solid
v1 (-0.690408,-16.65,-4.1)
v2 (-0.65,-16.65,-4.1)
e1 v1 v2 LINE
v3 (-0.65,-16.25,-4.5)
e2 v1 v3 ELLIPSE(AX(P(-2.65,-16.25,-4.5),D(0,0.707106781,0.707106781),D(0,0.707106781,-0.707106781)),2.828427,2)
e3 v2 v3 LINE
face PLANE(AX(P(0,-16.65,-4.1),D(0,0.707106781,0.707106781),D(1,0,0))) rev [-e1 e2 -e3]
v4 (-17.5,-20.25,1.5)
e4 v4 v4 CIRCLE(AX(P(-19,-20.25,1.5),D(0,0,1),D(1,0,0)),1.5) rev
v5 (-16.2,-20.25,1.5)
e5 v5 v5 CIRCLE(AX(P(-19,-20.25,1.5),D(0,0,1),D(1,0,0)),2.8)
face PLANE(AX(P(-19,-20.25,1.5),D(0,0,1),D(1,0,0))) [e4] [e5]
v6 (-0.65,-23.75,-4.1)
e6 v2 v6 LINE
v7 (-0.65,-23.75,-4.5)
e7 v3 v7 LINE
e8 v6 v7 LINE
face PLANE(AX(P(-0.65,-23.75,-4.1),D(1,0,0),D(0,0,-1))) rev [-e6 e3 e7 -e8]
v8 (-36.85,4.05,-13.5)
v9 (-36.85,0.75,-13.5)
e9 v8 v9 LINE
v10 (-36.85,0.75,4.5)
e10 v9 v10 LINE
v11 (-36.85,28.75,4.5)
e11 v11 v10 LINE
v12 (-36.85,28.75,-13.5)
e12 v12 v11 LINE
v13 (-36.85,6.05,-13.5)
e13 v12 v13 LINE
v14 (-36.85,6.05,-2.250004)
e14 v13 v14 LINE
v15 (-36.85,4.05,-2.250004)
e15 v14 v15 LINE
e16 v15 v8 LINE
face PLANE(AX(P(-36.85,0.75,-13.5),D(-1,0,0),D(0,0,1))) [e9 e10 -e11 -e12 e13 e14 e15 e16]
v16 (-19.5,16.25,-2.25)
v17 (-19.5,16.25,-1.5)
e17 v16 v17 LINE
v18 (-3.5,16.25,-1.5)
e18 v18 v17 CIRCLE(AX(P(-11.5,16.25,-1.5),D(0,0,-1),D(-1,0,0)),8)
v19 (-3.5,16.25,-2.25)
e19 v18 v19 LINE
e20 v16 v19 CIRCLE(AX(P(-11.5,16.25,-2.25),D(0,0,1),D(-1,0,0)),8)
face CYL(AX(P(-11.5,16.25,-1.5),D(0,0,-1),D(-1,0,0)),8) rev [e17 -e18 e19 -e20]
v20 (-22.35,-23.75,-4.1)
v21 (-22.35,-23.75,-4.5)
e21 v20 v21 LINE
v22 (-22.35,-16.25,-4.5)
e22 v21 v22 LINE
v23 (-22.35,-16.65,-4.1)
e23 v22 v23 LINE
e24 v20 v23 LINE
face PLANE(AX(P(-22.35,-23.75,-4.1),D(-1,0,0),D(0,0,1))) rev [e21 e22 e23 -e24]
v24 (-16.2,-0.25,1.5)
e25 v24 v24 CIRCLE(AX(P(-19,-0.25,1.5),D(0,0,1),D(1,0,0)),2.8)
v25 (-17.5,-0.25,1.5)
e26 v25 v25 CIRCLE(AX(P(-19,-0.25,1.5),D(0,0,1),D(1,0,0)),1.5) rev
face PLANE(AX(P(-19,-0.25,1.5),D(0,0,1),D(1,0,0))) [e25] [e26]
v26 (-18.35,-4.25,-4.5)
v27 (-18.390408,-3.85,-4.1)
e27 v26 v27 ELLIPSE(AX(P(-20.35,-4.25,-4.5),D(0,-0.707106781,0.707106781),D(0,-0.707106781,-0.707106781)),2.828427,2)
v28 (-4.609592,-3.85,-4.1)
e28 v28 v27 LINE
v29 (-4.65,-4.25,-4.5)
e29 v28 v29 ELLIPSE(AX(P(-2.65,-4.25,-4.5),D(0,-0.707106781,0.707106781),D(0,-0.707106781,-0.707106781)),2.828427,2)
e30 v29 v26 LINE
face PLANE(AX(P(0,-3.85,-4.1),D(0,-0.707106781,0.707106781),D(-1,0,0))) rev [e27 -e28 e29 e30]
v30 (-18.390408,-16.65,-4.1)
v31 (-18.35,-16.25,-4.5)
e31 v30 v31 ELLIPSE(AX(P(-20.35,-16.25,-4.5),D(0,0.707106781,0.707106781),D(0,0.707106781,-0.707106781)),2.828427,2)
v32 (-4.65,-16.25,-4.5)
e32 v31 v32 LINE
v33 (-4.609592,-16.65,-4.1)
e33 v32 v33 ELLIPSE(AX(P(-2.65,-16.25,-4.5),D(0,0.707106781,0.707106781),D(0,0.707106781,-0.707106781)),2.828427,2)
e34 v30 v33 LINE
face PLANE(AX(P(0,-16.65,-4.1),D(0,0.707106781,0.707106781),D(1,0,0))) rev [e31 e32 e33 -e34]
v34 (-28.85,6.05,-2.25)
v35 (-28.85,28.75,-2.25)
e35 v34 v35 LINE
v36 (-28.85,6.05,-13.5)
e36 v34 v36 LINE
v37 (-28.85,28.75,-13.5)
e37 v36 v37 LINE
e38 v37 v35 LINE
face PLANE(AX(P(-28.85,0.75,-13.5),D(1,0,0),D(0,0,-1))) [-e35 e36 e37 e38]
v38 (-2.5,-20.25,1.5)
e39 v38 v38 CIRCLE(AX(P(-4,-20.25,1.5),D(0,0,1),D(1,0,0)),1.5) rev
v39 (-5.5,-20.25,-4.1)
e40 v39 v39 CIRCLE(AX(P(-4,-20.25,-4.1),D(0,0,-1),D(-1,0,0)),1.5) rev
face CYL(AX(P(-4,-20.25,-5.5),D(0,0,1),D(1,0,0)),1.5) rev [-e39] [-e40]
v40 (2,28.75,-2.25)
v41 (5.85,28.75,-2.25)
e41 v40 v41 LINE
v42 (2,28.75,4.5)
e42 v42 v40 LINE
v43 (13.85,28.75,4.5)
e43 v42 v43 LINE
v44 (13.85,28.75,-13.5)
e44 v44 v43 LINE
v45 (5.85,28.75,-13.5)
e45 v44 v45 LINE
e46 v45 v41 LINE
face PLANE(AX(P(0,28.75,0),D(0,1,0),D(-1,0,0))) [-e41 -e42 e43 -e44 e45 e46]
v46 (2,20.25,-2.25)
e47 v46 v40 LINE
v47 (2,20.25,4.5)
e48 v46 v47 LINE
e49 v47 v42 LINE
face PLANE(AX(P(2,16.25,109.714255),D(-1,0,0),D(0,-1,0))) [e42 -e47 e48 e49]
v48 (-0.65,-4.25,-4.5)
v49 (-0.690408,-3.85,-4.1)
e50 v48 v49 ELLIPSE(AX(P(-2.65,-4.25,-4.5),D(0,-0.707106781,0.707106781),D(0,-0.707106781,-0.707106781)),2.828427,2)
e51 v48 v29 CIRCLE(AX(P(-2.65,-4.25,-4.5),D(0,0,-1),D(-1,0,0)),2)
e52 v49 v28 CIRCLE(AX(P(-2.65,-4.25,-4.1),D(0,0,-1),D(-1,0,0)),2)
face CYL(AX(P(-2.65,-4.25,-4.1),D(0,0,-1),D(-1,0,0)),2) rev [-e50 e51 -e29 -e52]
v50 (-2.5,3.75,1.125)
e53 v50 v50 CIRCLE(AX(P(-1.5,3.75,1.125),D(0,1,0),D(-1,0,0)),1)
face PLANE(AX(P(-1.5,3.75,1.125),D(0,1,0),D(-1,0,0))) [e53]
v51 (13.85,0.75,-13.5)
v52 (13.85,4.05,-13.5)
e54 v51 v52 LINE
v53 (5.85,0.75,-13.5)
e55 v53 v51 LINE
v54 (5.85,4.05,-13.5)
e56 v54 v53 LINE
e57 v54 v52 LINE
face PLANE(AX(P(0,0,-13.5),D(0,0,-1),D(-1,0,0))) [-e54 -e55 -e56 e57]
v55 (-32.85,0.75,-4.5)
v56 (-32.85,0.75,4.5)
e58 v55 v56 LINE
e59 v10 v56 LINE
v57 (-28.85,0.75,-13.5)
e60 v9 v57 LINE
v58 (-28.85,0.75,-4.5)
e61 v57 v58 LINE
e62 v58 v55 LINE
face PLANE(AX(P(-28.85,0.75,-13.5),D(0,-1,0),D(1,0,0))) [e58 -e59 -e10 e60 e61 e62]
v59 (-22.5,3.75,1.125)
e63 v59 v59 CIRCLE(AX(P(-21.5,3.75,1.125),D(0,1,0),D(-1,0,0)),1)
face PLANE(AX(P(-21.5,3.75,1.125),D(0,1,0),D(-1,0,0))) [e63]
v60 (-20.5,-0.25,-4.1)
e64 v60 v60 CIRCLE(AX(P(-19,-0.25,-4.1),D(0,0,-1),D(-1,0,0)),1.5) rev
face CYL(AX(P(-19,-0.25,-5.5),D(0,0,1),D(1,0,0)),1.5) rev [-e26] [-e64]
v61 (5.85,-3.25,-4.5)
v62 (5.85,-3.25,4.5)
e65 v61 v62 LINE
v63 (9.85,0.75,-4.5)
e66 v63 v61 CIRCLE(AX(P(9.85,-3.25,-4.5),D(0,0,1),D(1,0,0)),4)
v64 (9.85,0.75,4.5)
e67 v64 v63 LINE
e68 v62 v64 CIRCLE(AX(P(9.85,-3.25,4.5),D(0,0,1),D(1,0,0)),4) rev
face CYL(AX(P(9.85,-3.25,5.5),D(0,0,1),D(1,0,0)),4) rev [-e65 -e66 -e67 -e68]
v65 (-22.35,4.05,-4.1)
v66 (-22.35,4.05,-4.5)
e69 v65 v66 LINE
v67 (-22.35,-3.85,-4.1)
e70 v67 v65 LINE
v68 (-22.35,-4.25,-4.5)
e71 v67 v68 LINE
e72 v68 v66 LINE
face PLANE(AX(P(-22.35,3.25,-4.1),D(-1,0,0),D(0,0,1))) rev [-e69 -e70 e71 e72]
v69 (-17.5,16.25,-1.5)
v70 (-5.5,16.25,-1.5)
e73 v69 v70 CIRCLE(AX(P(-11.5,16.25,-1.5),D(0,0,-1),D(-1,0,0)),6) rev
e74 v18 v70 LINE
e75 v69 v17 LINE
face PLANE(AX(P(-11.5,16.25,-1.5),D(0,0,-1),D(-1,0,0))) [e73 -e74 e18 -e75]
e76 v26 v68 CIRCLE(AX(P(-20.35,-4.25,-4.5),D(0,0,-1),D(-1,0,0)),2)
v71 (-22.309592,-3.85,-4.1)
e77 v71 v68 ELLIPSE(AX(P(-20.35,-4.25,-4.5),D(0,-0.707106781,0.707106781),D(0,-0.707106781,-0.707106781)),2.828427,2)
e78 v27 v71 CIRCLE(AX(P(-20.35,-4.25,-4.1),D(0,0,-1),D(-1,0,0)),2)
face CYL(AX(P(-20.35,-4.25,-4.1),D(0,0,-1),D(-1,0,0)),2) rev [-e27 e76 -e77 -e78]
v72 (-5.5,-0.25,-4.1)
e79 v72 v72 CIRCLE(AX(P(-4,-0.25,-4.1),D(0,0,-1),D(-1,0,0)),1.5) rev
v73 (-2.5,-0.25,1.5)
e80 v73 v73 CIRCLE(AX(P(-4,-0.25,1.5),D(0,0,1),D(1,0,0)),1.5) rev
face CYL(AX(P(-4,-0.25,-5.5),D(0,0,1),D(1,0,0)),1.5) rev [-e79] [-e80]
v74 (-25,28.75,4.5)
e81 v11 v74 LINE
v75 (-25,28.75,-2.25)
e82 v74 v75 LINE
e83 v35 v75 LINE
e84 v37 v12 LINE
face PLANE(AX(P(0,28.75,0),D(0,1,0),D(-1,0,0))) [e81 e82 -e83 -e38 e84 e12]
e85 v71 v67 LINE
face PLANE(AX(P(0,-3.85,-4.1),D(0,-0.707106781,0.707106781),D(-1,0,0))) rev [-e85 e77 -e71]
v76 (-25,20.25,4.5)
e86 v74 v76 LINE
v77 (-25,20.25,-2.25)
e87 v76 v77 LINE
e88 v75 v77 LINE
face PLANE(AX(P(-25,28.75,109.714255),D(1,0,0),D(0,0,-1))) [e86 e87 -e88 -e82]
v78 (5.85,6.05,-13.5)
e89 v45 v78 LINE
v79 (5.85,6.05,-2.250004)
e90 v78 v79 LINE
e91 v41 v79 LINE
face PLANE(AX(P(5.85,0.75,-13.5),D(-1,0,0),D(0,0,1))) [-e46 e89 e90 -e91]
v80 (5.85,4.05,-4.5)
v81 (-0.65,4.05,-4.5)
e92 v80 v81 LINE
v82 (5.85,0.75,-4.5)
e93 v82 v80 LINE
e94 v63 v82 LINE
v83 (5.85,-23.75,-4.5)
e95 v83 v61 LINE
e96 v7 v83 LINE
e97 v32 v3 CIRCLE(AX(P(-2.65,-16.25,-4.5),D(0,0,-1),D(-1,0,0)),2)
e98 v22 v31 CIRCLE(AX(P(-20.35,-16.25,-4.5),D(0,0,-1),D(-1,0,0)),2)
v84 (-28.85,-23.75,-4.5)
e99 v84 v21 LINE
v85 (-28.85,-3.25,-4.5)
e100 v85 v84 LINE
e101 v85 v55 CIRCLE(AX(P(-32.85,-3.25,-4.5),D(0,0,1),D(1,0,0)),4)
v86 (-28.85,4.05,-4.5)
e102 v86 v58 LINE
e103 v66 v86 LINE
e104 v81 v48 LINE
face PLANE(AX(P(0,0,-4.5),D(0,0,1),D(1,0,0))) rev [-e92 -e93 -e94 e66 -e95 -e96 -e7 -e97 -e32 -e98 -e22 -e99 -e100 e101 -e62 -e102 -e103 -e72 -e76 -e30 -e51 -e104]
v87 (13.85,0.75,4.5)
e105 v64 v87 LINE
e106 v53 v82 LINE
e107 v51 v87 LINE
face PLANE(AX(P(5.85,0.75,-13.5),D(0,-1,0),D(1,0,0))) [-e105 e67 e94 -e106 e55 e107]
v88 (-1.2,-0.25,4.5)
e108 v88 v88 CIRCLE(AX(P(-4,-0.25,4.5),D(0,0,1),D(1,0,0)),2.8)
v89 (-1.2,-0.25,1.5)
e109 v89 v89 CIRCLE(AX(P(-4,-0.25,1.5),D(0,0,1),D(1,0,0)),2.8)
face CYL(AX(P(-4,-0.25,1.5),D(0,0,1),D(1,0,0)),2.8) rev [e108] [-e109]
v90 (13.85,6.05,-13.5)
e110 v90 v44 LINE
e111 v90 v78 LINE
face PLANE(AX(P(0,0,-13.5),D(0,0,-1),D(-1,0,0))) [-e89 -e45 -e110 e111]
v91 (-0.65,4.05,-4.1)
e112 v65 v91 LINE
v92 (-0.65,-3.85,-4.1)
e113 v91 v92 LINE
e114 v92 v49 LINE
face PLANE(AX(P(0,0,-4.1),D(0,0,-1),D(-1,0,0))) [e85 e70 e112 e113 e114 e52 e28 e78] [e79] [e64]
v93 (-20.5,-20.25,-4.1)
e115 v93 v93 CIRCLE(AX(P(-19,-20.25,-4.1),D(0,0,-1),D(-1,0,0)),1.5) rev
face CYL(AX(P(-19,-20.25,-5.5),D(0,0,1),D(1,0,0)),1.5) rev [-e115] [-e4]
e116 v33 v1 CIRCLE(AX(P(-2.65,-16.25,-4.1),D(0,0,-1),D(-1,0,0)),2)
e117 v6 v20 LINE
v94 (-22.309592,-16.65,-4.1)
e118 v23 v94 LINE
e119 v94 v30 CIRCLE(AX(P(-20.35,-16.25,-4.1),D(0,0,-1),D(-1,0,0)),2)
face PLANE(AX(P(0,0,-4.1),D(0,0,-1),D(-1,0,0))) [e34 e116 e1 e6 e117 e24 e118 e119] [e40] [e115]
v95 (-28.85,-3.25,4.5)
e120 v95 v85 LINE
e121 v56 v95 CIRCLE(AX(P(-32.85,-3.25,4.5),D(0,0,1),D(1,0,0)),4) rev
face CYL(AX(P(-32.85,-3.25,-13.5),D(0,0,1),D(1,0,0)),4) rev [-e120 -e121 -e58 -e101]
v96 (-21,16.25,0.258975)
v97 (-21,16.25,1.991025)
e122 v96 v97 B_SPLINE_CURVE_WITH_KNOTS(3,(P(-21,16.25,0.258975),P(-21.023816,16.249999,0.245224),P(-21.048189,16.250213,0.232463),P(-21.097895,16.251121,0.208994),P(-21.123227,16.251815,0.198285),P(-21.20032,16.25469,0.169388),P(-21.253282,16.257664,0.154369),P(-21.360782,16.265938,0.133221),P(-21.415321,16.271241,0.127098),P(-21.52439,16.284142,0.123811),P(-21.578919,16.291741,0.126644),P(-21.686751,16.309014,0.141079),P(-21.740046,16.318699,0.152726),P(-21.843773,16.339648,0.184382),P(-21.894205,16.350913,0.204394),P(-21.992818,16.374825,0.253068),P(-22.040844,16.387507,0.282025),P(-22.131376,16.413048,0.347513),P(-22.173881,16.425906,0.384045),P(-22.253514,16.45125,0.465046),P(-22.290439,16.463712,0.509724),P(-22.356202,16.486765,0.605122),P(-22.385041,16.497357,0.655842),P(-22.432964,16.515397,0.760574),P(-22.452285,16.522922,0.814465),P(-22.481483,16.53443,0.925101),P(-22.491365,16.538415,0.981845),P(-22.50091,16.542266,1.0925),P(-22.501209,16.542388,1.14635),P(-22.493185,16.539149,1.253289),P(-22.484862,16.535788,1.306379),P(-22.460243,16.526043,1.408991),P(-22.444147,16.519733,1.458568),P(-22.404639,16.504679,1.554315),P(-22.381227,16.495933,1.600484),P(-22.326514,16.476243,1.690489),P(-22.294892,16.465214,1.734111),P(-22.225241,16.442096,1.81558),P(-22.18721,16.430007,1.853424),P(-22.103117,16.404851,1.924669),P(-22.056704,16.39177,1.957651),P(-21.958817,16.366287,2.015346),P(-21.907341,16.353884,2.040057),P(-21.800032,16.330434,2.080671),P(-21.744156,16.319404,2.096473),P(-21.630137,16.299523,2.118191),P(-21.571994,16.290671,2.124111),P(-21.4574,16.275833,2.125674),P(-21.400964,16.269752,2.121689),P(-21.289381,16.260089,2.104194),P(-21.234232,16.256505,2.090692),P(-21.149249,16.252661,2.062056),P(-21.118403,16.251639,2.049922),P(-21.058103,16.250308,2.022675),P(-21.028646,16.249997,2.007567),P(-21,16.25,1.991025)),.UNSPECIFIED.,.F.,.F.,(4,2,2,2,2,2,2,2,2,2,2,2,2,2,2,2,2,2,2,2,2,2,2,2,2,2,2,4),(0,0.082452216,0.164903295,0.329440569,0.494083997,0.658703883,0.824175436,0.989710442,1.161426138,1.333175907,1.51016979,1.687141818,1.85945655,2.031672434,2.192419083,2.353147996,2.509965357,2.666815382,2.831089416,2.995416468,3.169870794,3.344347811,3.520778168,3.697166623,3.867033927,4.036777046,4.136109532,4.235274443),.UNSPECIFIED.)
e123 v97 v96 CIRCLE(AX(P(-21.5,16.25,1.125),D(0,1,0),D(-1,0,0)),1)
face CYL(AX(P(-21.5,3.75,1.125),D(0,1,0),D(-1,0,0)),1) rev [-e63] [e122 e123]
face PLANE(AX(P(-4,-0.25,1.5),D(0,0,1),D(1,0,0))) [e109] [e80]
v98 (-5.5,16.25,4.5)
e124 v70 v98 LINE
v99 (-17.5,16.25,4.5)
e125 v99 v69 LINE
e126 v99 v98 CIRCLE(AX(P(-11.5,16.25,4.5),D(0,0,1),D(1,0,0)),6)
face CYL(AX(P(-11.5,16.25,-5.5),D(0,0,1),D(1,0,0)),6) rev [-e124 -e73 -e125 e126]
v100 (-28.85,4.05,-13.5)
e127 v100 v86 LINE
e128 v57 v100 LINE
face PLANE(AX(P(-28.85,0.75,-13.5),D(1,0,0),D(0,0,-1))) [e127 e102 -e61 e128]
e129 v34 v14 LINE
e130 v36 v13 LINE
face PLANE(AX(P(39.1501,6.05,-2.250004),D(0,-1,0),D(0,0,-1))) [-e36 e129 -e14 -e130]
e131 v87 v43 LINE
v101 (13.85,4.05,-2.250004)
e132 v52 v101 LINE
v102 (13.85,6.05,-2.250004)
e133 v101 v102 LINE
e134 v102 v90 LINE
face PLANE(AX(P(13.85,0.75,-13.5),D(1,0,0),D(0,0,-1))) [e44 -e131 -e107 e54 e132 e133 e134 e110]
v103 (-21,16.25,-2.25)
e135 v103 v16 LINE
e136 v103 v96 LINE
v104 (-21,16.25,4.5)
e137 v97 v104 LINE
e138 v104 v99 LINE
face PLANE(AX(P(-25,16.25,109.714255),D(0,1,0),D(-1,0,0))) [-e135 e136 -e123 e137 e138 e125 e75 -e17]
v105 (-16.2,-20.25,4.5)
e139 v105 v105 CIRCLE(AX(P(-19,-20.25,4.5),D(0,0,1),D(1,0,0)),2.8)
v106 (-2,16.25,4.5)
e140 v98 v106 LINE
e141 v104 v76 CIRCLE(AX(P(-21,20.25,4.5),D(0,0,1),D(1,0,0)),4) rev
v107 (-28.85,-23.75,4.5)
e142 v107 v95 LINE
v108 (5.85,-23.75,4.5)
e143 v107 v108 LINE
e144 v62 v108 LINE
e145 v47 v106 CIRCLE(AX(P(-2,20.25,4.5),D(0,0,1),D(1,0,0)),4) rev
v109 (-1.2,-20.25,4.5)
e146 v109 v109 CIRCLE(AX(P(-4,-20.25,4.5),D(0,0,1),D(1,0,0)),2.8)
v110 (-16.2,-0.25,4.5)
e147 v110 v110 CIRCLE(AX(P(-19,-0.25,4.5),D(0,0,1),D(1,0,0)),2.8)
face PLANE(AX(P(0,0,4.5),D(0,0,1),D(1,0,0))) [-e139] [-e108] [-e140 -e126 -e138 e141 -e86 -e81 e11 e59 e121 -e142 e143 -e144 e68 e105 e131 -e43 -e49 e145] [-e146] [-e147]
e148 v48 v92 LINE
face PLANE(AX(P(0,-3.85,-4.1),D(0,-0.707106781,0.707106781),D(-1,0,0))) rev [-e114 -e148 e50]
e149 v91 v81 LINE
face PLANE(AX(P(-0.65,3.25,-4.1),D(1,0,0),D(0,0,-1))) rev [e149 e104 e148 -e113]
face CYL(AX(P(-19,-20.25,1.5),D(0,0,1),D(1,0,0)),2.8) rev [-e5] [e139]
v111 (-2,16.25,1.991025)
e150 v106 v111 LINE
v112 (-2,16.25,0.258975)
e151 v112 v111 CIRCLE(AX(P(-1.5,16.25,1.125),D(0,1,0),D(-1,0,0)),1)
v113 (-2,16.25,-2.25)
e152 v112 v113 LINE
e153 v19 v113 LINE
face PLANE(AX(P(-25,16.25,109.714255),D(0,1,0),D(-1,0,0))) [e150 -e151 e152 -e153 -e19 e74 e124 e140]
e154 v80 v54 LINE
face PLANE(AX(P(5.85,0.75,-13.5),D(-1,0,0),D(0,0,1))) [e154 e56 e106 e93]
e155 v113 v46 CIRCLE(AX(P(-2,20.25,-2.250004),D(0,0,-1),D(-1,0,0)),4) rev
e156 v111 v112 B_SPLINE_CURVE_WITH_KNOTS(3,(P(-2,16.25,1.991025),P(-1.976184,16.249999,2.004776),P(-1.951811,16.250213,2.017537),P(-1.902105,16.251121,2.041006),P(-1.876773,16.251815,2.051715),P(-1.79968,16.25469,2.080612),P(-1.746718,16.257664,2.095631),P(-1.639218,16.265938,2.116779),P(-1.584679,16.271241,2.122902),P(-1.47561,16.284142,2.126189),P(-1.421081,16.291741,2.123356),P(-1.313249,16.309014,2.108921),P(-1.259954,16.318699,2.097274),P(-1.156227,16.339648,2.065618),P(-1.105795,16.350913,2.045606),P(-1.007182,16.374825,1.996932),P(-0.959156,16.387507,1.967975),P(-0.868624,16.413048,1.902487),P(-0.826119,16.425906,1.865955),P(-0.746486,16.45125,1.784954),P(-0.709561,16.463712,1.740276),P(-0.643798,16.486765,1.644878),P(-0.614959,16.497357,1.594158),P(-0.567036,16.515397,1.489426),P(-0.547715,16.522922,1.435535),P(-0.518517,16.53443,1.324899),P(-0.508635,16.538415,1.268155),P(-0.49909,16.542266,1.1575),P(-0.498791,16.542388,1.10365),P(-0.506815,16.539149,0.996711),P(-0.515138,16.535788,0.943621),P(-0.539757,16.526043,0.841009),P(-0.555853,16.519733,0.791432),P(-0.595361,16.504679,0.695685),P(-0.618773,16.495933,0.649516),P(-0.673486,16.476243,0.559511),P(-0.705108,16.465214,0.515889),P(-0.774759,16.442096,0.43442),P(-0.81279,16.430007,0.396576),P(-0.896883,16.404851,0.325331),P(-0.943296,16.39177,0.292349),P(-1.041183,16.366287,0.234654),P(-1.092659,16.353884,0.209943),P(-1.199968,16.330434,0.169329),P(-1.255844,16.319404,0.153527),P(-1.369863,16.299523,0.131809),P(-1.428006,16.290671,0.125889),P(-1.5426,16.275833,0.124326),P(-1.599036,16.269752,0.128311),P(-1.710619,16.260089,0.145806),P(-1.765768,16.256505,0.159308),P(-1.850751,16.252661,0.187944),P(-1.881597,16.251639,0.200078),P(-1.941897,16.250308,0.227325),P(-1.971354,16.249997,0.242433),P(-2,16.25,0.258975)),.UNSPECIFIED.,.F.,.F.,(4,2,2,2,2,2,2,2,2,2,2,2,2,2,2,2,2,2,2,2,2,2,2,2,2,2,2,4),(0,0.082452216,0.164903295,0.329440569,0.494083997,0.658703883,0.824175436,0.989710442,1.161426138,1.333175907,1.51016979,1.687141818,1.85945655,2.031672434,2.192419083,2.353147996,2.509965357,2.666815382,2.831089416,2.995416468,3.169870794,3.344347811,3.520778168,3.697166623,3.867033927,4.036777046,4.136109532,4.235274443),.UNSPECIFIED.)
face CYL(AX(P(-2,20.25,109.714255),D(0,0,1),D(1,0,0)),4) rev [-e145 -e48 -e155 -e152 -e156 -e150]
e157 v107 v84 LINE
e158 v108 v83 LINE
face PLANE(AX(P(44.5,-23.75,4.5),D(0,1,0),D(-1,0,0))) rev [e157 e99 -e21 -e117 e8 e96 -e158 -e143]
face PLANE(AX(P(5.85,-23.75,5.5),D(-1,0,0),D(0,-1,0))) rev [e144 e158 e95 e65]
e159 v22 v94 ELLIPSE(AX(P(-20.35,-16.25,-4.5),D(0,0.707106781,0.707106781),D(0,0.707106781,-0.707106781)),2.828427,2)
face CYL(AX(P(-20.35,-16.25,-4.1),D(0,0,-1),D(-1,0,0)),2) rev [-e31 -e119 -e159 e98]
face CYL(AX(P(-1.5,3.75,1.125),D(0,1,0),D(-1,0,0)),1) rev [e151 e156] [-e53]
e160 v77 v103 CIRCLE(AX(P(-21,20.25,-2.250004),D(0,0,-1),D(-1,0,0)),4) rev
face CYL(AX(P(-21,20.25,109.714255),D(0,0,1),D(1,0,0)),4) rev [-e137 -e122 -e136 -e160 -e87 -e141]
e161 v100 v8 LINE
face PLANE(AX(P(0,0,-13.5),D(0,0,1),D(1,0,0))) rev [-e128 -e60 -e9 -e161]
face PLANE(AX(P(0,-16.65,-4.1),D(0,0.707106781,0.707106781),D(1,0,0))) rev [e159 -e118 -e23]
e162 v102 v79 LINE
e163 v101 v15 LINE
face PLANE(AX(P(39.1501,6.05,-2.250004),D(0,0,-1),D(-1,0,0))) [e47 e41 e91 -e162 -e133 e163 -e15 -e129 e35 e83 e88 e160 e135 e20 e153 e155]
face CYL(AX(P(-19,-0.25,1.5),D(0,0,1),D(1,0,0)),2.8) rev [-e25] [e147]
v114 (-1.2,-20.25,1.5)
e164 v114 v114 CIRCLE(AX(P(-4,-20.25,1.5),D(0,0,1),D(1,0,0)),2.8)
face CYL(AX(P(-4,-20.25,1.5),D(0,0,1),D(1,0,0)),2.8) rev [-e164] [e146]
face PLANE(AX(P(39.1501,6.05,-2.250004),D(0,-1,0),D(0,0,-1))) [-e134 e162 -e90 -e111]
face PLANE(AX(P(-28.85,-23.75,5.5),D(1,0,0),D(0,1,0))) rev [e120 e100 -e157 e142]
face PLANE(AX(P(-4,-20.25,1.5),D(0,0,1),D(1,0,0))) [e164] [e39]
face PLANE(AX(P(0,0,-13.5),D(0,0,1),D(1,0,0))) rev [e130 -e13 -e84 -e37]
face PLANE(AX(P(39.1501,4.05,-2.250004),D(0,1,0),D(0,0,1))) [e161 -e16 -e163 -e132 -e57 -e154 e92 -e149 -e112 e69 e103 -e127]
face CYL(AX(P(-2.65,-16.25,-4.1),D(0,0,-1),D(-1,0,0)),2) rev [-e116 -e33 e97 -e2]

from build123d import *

# Parameters (mm, degrees)
BOSS_EXTRUDE1_DEPTH      = 4.5
SKETCH4_W                = 35.509158229
SKETCH4_H                = 48.512063823
CUT_EXTRUDE2_DEPTH       = 10
SKETCH8_W                = 66
SKETCH8_H                = 9
BOSS_EXTRUDE3_DEPTH      = 5
FILLET7_R                = 10
SKETCH16_R               = 1.5
CUT_EXTRUDE6_DEPTH       = 10
SKETCH17_W               = 15.65
SKETCH17_H               = 52.5
CUT_EXTRUDE7_DEPTH       = 10
SKETCH18_R               = 6
CUT_EXTRUDE8_DEPTH       = 10
SKETCH20_W               = 8
SKETCH20_H               = 28
BOSS_EXTRUDE5_DEPTH      = 18
CUT_EXTRUDE10_DEPTH      = 51.084778127
CUT_EXTRUDE10_DEPTH_BACK = 9
SKETCH23_R               = 8
CUT_EXTRUDE11_DEPTH      = 3
CUT_EXTRUDE12_DEPTH      = 68.0001
CUT_EXTRUDE12_DEPTH_BACK = 8
CUT_EXTRUDE12_START      = -42.7
SKETCH24_W               = 11.249996001
SKETCH24_H               = 2
SKETCH25_R               = 1
CUT_EXTRUDE13_DEPTH      = 12.5
CUT_EXTRUDE15_DEPTH      = 2.25
FILLET8_R                = 4
SKETCH27_W               = 21.7
SKETCH27_H               = 7.5
CUT_EXTRUDE16_DEPTH      = 0.4
CHAMFER1_SIZE            = 0.4
CHAMFER2_SIZE            = 0.4
SKETCH28_R               = 2.8
CUT_EXTRUDE17_DEPTH      = 3
SKETCH29_R               = 2
SKETCH29_W               = 21.7
SKETCH29_H               = 0.8
CUT_EXTRUDE18_DEPTH      = 0.4


# Some blends are built 0.0001 mm under size
with BuildPart() as part:
    # Sketch1 → Boss-Extrude1 (new, symmetric)
    with BuildSketch(Plane.XY):
        Polygon((44.5, -23.75), (-0.5, -23.75), (-44.5, -23.75), (-44.5, 23.75), (44.5, 23.75), align=None)
    extrude(amount=BOSS_EXTRUDE1_DEPTH, both=True)

    # Sketch4 → Cut-Extrude2 (cut)
    with BuildSketch(Plane.XY.offset(4.5)):
        with Locations((39.254579115, -0.506031912)):
            Rectangle(SKETCH4_W, SKETCH4_H)
    extrude(amount=-CUT_EXTRUDE2_DEPTH, mode=Mode.SUBTRACT)

    # Sketch8 → Boss-Extrude3 (add)
    with BuildSketch(Plane(origin=(0, 23.75, 0), x_dir=(1, 0, 0), z_dir=(0, 1, 0))):
        with Locations((-11.5, 0)):
            Rectangle(SKETCH8_W, SKETCH8_H)
    extrude(amount=BOSS_EXTRUDE3_DEPTH)

    # Fillet7
    fillet7_edges = [part.edges().sort_by_distance(p)[0] for p in [
        (-44.5, 28.75, 0),
        (21.5, 28.75, 0),
    ]]
    fillet(fillet7_edges, radius=FILLET7_R)

    # Sketch16 → Cut-Extrude6 (cut)
    with BuildSketch(Plane.XY.offset(4.5)):
        with Locations((-19, -0.25)):
            Circle(SKETCH16_R)
        with Locations((-4, -0.25)):
            Circle(SKETCH16_R)
        with Locations((-19, -20.25)):
            Circle(SKETCH16_R)
        with Locations((-4, -20.25)):
            Circle(SKETCH16_R)
    extrude(amount=-CUT_EXTRUDE6_DEPTH, mode=Mode.SUBTRACT)

    # Sketch17 → Cut-Extrude7 (cut)
    with BuildSketch(Plane(origin=(0, 0, -4.5), x_dir=(-1, 0, 0), z_dir=(0, 0, -1))):
        with Locations((36.675, 2.5)):
            Rectangle(SKETCH17_W, SKETCH17_H)
        with Locations((-13.675, 2.5)):
            Rectangle(SKETCH17_W, SKETCH17_H)
    extrude(amount=-CUT_EXTRUDE7_DEPTH, mode=Mode.SUBTRACT)

    # Sketch18 → Cut-Extrude8 (cut)
    with BuildSketch(Plane.XY.offset(4.5)):
        with Locations((-11.5, 16.25)):
            Circle(SKETCH18_R)
    extrude(amount=-CUT_EXTRUDE8_DEPTH, mode=Mode.SUBTRACT)

    # Sketch20 → Boss-Extrude5 (add)
    with BuildSketch(Plane.XY.offset(4.5)):
        with Locations((-32.85, 14.75)):
            Rectangle(SKETCH20_W, SKETCH20_H)
        with Locations((9.85, 14.75)):
            Rectangle(SKETCH20_W, SKETCH20_H)
    extrude(amount=-BOSS_EXTRUDE5_DEPTH)

    # Sketch22 → Cut-Extrude10 (cut, two sides: drawn at the far end of the back side and taken through both)
    with BuildSketch(Plane.XY.offset(4.5).offset(-CUT_EXTRUDE10_DEPTH_BACK)):
        Polygon((-25, 169.372700937), (-25, 28.75), (-25, 16.25), (2, 16.25), (2, 28.75), (2, 169.372700937), (2, 450.61810281), (-25, 450.61810281), align=None)
    extrude(amount=CUT_EXTRUDE10_DEPTH + CUT_EXTRUDE10_DEPTH_BACK, mode=Mode.SUBTRACT)

    # Sketch23 → Cut-Extrude11 (cut)
    with BuildSketch(Plane(origin=(0, 0, -4.5), x_dir=(-1, 0, 0), z_dir=(0, 0, -1))):
        with Locations((11.5, 16.25)):
            Circle(SKETCH23_R)
    extrude(amount=-CUT_EXTRUDE11_DEPTH, mode=Mode.SUBTRACT)

    # Sketch24 → Cut-Extrude12 (cut, two sides: drawn at the far end of the back side and taken through both)
    with BuildSketch(Plane(origin=(13.85, 0, 0), x_dir=(0, 0, -1), z_dir=(1, 0, 0)).offset(CUT_EXTRUDE12_START - CUT_EXTRUDE12_DEPTH_BACK)):
        with Locations((7.875002, 5.05)):
            Rectangle(SKETCH24_W, SKETCH24_H)
    extrude(amount=CUT_EXTRUDE12_DEPTH + CUT_EXTRUDE12_DEPTH_BACK, mode=Mode.SUBTRACT)

    # Sketch25 → Cut-Extrude13 (cut)
    with BuildSketch(Plane(origin=(0, 16.25, 0), x_dir=(1, 0, 0), z_dir=(0, 1, 0))):
        with Locations(Location((-1.5, -1.125, 0), (0, 0, 180))):
            Circle(SKETCH25_R)
        with Locations(Location((-21.5, -1.125, 0), (0, 0, 180))):
            Circle(SKETCH25_R)
    extrude(amount=-CUT_EXTRUDE13_DEPTH, mode=Mode.SUBTRACT)

    # Sketch26 → Cut-Extrude15 (cut)
    with BuildSketch(Plane(origin=(0, 0, -4.5), x_dir=(-1, 0, 0), z_dir=(0, 0, -1))):
        with BuildLine():
            Line((-5.85, 6.05), (28.85, 6.05))
            Line((28.85, 6.05), (28.85, 28.75))
            Line((28.85, 28.75), (25, 28.75))
            Line((25, 28.75), (25, 16.25))
            Line((25, 16.25), (19.5, 16.25))
            ThreePointArc((19.5, 16.25), (11.5, 8.25), (3.5, 16.25))
            Line((3.5, 16.25), (-2, 16.25))
            Line((-2, 16.25), (-2, 28.75))
            Line((-2, 28.75), (-5.85, 28.75))
            Line((-5.85, 28.75), (-5.85, 6.05))
        make_face()
    extrude(amount=-CUT_EXTRUDE15_DEPTH, mode=Mode.SUBTRACT)

    # Fillet8
    # the kernel refuses this fillet: 4 mm, written as the material it adds along each edge
    with BuildSketch(Plane(origin=(-28.85, 0.75, 4.5), x_dir=(-1, 0, 0), z_dir=(0, 0, -1))) as fillet8_piece_1:
        with BuildLine():
            CenterArc((FILLET8_R, -FILLET8_R), FILLET8_R, 90, 90)
            Line((0, -FILLET8_R), (0, 0))
            Line((0, 0), (FILLET8_R, 0))
        make_face()
    extrude(amount=9)
    with BuildSketch(Plane(origin=(5.85, 0.75, 4.5), x_dir=(1, 0, 0), z_dir=(0, 0, -1))) as fillet8_piece_2:
        with BuildLine():
            CenterArc((FILLET8_R, FILLET8_R), FILLET8_R, 180, 90)
            Line((0, FILLET8_R), (0, 0))
            Line((0, 0), (FILLET8_R, 0))
        make_face()
    extrude(amount=9)
    with BuildSketch(Plane(origin=(2, 16.25, -2.25), x_dir=(-1, 0, 0), z_dir=(0, 0, 1))) as fillet8_piece_3_section:
        with BuildLine():
            CenterArc((FILLET8_R, -FILLET8_R), FILLET8_R, 90, 90)
            Line((0, -FILLET8_R), (0, 0))
            Line((0, 0), (FILLET8_R, 0))
        make_face()
    fillet8_piece_3 = extrude(amount=6.75, mode=Mode.PRIVATE)
    fillet8_piece_3 = fillet8_piece_3 - Plane(origin=(-1.5, 17.15044089, 1.125), x_dir=(-1, 0, 0), z_dir=(0, 1, 0)) * Cylinder(1, 30, mode=Mode.PRIVATE)
    add(fillet8_piece_3)
    with BuildSketch(Plane(origin=(-25, 16.25, -2.25), x_dir=(0, 1, 0), z_dir=(0, 0, 1))) as fillet8_piece_4_section:
        with BuildLine():
            CenterArc((FILLET8_R, -FILLET8_R), FILLET8_R, 90, 90)
            Line((0, -FILLET8_R), (0, 0))
            Line((0, 0), (FILLET8_R, 0))
        make_face()
    fillet8_piece_4 = extrude(amount=6.75, mode=Mode.PRIVATE)
    fillet8_piece_4 = fillet8_piece_4 - Plane(origin=(-21.5, 17.150440868, 1.125), x_dir=(-1, 0, 0), z_dir=(0, 1, 0)) * Cylinder(1, 30, mode=Mode.PRIVATE)
    add(fillet8_piece_4)

    # Sketch27 → Cut-Extrude16 (cut)
    with BuildSketch(Plane(origin=(0, 0, -4.5), x_dir=(-1, 0, 0), z_dir=(0, 0, -1))):
        with Locations((11.5, -20)):
            Rectangle(SKETCH27_W, SKETCH27_H)
        with Locations((11.5, -0.5)):
            Rectangle(SKETCH27_W, SKETCH27_H)
    extrude(amount=-CUT_EXTRUDE16_DEPTH, mode=Mode.SUBTRACT)

    # Chamfer1
    chamfer1_edges = [part.edges().sort_by_distance(p)[0] for p in [
        (-11.5, -4.25, -4.1),
    ]]
    chamfer(chamfer1_edges, length=CHAMFER1_SIZE - 0.0001)  # a hair under: the kernel refuses the full size

    # Chamfer2
    chamfer2_edges = [part.edges().sort_by_distance(p)[0] for p in [
        (-11.5, -16.25, -4.1),
    ]]
    chamfer(chamfer2_edges, length=CHAMFER2_SIZE - 0.0001)  # a hair under: the kernel refuses the full size

    # Sketch28 → Cut-Extrude17 (cut)
    with BuildSketch(Plane.XY.offset(4.5)):
        with Locations((-19, -0.25)):
            Circle(SKETCH28_R)
        with Locations((-4, -0.25)):
            Circle(SKETCH28_R)
        with Locations((-4, -20.25)):
            Circle(SKETCH28_R)
        with Locations((-19, -20.25)):
            Circle(SKETCH28_R)
    extrude(amount=-CUT_EXTRUDE17_DEPTH, mode=Mode.SUBTRACT)

    # Sketch29 → Cut-Extrude18 (cut)
    with BuildSketch(Plane(origin=(0, 0, -4.5), x_dir=(-1, 0, 0), z_dir=(0, 0, -1))):
        with Locations((2.65, -4.25)):
            Circle(SKETCH29_R)
        with Locations((20.35, -4.25)):
            Circle(SKETCH29_R)
        with Locations((2.65, -16.25)):
            Circle(SKETCH29_R)
        with Locations((20.35, -16.25)):
            Circle(SKETCH29_R)
        with Locations((11.5, 3.65)):
            Rectangle(SKETCH29_W, SKETCH29_H)
    extrude(amount=-CUT_EXTRUDE18_DEPTH, mode=Mode.SUBTRACT)


solid = part.part
